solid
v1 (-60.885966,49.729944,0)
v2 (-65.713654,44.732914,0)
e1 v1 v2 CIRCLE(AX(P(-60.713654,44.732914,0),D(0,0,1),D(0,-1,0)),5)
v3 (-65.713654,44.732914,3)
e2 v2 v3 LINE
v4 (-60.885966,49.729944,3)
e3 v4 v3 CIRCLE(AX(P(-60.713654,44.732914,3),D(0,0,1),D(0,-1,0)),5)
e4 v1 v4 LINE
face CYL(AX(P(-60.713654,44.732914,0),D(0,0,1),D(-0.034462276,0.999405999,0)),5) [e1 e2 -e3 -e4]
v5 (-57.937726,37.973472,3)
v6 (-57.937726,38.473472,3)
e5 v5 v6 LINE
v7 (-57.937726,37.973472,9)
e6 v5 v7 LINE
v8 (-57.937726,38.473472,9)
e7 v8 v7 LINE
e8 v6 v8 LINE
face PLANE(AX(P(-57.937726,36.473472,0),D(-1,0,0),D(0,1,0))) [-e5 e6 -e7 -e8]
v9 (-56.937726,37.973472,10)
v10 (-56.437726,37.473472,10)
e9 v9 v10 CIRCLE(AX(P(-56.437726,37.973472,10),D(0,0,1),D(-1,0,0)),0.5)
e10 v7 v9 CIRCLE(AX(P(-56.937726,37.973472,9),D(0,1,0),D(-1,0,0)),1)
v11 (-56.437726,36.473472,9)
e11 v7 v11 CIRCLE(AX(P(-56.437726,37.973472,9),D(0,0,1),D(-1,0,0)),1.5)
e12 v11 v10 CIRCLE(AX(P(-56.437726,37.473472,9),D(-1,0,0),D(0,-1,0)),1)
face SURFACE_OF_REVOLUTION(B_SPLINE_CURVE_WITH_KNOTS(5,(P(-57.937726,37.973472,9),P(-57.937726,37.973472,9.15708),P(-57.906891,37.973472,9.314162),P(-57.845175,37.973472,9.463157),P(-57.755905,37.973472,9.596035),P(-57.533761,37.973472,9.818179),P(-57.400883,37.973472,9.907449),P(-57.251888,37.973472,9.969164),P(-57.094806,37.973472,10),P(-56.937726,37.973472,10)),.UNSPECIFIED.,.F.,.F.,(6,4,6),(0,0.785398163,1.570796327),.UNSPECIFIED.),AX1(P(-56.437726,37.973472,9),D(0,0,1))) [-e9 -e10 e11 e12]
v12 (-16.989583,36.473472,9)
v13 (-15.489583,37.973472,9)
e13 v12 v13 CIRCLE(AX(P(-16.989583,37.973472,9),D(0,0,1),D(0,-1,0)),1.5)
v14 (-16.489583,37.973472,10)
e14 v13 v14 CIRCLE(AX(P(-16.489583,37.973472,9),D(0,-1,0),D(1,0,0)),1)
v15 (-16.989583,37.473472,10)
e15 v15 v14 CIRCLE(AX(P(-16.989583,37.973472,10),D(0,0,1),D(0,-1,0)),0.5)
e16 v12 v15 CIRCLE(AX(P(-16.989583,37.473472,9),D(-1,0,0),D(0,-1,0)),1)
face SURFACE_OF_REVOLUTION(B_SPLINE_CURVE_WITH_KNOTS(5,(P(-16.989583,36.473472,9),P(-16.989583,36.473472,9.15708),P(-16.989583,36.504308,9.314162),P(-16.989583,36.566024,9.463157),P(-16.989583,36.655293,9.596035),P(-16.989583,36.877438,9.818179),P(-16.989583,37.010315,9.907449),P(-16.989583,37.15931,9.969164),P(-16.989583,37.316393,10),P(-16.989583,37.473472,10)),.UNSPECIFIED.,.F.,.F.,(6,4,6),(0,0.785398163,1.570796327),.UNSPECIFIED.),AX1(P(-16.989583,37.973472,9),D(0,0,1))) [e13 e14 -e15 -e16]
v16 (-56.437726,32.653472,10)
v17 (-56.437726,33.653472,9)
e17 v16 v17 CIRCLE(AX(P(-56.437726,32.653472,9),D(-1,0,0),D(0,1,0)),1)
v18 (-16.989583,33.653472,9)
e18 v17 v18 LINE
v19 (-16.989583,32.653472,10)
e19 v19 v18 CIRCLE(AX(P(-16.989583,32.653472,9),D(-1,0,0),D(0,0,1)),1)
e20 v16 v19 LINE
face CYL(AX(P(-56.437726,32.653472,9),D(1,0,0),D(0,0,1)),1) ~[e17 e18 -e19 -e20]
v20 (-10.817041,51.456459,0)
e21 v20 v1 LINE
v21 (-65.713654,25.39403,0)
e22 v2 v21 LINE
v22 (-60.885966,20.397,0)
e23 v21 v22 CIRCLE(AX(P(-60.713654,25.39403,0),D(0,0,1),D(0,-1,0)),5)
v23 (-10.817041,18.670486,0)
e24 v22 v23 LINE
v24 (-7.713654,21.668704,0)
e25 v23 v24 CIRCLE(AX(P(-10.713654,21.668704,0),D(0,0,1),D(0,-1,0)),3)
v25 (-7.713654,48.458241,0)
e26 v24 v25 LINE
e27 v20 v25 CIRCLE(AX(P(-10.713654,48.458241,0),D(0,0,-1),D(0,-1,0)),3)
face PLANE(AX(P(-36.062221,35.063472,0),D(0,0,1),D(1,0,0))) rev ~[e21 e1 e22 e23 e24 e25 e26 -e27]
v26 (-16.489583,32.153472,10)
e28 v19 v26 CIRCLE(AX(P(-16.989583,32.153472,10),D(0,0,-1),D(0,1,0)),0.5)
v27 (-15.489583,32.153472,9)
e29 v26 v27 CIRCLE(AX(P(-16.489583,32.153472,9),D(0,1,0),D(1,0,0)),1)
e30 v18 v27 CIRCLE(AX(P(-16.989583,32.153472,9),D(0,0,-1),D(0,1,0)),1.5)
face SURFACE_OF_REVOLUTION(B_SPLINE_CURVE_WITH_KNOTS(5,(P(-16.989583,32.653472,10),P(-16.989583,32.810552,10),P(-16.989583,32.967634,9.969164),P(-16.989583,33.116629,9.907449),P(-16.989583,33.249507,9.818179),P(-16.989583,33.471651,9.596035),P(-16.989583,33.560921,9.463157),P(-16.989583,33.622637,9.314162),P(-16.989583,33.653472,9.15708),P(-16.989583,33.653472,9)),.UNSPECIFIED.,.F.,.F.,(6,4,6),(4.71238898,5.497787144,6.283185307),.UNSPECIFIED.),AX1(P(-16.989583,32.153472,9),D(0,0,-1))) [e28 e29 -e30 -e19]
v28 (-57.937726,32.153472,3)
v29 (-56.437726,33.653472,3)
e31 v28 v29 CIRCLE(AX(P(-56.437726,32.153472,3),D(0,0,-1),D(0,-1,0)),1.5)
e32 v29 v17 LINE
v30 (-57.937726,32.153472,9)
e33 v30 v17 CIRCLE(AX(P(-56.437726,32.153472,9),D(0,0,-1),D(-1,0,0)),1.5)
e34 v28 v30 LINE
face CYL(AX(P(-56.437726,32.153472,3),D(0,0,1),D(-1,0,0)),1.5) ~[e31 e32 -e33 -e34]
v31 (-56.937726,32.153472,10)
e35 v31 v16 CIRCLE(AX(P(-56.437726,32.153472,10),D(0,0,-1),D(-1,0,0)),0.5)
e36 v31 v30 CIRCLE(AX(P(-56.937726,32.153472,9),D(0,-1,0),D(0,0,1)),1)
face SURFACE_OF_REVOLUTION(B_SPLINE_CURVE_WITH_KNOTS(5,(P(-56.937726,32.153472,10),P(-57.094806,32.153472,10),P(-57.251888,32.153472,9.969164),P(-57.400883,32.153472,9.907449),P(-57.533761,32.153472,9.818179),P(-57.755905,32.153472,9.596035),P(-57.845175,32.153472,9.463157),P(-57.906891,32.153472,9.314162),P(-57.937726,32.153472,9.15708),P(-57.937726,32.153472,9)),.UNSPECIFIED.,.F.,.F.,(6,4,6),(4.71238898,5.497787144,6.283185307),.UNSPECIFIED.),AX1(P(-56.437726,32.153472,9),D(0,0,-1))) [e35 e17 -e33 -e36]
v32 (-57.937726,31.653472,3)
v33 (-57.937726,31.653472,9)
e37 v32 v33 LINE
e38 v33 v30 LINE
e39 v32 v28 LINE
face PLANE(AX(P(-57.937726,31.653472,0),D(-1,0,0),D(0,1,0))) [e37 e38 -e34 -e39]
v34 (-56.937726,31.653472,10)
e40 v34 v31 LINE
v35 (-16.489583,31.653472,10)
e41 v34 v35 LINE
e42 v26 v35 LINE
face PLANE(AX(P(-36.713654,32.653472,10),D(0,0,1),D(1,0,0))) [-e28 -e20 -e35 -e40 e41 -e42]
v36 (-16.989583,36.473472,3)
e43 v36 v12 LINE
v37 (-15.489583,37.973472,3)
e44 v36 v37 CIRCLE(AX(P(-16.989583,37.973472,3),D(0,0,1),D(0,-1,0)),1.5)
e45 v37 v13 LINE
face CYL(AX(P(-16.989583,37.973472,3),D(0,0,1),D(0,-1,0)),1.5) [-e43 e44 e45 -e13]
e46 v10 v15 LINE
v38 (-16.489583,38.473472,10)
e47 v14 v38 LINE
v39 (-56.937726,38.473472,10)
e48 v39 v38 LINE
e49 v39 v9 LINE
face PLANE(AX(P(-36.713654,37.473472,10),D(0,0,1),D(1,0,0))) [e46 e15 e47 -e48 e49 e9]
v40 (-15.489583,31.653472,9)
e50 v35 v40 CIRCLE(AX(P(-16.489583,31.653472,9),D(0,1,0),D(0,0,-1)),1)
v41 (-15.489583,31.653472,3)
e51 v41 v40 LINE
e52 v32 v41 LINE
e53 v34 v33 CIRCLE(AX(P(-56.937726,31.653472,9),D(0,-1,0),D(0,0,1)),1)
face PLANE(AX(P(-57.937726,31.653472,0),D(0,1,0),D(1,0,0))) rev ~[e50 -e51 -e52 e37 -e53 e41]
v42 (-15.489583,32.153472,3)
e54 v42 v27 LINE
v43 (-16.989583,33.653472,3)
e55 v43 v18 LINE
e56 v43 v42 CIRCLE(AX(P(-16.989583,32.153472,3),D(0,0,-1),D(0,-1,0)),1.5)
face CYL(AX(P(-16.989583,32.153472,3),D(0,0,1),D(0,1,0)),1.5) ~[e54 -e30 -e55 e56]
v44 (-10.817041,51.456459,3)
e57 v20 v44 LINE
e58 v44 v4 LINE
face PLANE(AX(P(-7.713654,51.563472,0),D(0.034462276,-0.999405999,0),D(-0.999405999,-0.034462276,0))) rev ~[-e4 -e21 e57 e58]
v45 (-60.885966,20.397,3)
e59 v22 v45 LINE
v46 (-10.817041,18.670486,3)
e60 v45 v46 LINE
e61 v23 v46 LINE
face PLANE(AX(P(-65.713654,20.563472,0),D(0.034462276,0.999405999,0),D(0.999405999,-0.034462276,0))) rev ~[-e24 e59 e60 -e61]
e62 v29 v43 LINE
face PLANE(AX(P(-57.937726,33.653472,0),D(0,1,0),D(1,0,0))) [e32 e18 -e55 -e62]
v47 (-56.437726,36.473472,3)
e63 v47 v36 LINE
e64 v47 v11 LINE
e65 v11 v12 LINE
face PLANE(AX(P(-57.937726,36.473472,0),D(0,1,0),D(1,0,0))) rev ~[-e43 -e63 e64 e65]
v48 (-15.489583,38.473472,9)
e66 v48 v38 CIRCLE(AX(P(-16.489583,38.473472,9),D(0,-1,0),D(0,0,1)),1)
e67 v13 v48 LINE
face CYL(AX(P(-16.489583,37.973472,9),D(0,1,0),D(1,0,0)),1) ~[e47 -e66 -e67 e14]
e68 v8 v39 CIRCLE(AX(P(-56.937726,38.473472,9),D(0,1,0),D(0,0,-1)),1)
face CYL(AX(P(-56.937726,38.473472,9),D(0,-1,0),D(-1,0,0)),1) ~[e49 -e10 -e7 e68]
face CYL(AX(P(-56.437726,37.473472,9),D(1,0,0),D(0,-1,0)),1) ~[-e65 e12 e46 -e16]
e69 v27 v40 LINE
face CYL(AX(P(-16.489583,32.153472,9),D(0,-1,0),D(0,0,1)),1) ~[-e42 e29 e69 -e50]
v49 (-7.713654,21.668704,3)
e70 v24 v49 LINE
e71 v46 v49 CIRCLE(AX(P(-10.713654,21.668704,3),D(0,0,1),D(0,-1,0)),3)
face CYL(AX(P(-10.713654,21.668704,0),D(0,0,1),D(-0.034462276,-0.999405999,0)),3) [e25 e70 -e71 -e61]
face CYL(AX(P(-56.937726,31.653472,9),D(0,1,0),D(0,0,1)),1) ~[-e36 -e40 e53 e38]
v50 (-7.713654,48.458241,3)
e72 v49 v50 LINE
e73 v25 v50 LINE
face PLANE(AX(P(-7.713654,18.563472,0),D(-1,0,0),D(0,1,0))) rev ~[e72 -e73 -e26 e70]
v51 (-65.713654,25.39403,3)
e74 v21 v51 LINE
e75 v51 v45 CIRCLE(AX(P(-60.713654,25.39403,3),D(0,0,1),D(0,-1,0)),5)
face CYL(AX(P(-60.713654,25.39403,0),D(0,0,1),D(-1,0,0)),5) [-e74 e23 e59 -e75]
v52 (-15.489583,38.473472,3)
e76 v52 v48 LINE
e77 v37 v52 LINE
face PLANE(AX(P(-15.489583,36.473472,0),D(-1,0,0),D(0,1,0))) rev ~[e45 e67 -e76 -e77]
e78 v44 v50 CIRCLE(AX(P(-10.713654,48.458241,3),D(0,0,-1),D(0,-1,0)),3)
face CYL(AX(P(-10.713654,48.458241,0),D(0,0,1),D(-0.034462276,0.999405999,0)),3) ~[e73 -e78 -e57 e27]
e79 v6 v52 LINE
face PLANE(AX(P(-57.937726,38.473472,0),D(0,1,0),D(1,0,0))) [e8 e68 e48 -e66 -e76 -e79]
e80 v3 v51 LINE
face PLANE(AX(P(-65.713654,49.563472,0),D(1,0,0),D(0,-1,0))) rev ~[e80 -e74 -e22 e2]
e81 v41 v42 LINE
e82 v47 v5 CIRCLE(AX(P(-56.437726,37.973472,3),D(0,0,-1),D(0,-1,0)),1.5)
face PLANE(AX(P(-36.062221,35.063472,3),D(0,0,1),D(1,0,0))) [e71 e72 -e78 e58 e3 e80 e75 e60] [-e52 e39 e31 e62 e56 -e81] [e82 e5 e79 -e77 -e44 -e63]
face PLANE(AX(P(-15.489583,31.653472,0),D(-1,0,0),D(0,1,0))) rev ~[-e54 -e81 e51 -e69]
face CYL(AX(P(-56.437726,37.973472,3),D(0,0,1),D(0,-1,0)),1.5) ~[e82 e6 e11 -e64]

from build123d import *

# Parameters (mm, degrees)
F0_W     = 42.4481438452
F0_H     = 2
F1_DEPTH = 3
F2_DEPTH = 10
F3_R     = 1.5
F4_R     = 1
F5_R     = 3
F6_R     = 5


with BuildPart() as f1:
    # F0 (on Top) → F1 (new body)
    with BuildSketch(Plane.XY):
        Polygon((-65.7136544558, 49.5634722376), (-65.7136544558, 36.4734722376), (-65.7136544558, 35.0634722376), (-65.7136544558, 33.6534722376), (-65.7136544558, 20.5634722376), (-7.7136544558, 18.5634722376), (-7.7136544558, 51.5634722376), align=None)
        with Locations((-36.7136544558, 32.6534722376)):
            Rectangle(F0_W, F0_H, mode=Mode.SUBTRACT)
        with Locations((-36.7136544558, 37.4734722376)):
            Rectangle(F0_W, F0_H, mode=Mode.SUBTRACT)
    extrude(amount=F1_DEPTH)

    # F0 (on Top) → F2 (join)
    with BuildSketch(Plane.XY):
        with Locations((-36.7136544558, 32.6534722376)):
            Rectangle(F0_W, F0_H)
        with Locations((-36.7136544558, 37.4734722376)):
            Rectangle(F0_W, F0_H)
    extrude(amount=F2_DEPTH)

    # F3
    f3_edges = [f1.edges().sort_by_distance(p)[0] for p in [
        (-57.937726, 36.473472, 6.5),
        (-57.937726, 33.653472, 6.5),
        (-15.489583, 36.473472, 6.5),
        (-15.489583, 33.653472, 6.5),
    ]]
    fillet(f3_edges, radius=F3_R)

    # F4
    f4_edges = [f1.edges().sort_by_distance(p)[0] for p in [
        (-36.713654, 36.473472, 10),
        (-36.713654, 33.653472, 10),
        (-57.498387, 33.214132, 10),
        (-15.928922, 33.214132, 10),
        (-57.937726, 31.903472, 10),
        (-15.489583, 31.903472, 10),
        (-57.937726, 38.223472, 10),
        (-57.498387, 36.912812, 10),
        (-15.489583, 38.223472, 10),
        (-15.928922, 36.912812, 10),
    ]]
    fillet(f4_edges, radius=F4_R)

    # F5
    f5_edges = [f1.edges().sort_by_distance(p)[0] for p in [
        (-7.713654, 18.563472, 1.5),
        (-7.713654, 51.563472, 1.5),
    ]]
    fillet(f5_edges, radius=F5_R)

    # F6
    f6_edges = [f1.edges().sort_by_distance(p)[0] for p in [
        (-65.713654, 20.563472, 1.5),
        (-65.713654, 49.563472, 1.5),
    ]]
    fillet(f6_edges, radius=F6_R)


solid = f1.part
